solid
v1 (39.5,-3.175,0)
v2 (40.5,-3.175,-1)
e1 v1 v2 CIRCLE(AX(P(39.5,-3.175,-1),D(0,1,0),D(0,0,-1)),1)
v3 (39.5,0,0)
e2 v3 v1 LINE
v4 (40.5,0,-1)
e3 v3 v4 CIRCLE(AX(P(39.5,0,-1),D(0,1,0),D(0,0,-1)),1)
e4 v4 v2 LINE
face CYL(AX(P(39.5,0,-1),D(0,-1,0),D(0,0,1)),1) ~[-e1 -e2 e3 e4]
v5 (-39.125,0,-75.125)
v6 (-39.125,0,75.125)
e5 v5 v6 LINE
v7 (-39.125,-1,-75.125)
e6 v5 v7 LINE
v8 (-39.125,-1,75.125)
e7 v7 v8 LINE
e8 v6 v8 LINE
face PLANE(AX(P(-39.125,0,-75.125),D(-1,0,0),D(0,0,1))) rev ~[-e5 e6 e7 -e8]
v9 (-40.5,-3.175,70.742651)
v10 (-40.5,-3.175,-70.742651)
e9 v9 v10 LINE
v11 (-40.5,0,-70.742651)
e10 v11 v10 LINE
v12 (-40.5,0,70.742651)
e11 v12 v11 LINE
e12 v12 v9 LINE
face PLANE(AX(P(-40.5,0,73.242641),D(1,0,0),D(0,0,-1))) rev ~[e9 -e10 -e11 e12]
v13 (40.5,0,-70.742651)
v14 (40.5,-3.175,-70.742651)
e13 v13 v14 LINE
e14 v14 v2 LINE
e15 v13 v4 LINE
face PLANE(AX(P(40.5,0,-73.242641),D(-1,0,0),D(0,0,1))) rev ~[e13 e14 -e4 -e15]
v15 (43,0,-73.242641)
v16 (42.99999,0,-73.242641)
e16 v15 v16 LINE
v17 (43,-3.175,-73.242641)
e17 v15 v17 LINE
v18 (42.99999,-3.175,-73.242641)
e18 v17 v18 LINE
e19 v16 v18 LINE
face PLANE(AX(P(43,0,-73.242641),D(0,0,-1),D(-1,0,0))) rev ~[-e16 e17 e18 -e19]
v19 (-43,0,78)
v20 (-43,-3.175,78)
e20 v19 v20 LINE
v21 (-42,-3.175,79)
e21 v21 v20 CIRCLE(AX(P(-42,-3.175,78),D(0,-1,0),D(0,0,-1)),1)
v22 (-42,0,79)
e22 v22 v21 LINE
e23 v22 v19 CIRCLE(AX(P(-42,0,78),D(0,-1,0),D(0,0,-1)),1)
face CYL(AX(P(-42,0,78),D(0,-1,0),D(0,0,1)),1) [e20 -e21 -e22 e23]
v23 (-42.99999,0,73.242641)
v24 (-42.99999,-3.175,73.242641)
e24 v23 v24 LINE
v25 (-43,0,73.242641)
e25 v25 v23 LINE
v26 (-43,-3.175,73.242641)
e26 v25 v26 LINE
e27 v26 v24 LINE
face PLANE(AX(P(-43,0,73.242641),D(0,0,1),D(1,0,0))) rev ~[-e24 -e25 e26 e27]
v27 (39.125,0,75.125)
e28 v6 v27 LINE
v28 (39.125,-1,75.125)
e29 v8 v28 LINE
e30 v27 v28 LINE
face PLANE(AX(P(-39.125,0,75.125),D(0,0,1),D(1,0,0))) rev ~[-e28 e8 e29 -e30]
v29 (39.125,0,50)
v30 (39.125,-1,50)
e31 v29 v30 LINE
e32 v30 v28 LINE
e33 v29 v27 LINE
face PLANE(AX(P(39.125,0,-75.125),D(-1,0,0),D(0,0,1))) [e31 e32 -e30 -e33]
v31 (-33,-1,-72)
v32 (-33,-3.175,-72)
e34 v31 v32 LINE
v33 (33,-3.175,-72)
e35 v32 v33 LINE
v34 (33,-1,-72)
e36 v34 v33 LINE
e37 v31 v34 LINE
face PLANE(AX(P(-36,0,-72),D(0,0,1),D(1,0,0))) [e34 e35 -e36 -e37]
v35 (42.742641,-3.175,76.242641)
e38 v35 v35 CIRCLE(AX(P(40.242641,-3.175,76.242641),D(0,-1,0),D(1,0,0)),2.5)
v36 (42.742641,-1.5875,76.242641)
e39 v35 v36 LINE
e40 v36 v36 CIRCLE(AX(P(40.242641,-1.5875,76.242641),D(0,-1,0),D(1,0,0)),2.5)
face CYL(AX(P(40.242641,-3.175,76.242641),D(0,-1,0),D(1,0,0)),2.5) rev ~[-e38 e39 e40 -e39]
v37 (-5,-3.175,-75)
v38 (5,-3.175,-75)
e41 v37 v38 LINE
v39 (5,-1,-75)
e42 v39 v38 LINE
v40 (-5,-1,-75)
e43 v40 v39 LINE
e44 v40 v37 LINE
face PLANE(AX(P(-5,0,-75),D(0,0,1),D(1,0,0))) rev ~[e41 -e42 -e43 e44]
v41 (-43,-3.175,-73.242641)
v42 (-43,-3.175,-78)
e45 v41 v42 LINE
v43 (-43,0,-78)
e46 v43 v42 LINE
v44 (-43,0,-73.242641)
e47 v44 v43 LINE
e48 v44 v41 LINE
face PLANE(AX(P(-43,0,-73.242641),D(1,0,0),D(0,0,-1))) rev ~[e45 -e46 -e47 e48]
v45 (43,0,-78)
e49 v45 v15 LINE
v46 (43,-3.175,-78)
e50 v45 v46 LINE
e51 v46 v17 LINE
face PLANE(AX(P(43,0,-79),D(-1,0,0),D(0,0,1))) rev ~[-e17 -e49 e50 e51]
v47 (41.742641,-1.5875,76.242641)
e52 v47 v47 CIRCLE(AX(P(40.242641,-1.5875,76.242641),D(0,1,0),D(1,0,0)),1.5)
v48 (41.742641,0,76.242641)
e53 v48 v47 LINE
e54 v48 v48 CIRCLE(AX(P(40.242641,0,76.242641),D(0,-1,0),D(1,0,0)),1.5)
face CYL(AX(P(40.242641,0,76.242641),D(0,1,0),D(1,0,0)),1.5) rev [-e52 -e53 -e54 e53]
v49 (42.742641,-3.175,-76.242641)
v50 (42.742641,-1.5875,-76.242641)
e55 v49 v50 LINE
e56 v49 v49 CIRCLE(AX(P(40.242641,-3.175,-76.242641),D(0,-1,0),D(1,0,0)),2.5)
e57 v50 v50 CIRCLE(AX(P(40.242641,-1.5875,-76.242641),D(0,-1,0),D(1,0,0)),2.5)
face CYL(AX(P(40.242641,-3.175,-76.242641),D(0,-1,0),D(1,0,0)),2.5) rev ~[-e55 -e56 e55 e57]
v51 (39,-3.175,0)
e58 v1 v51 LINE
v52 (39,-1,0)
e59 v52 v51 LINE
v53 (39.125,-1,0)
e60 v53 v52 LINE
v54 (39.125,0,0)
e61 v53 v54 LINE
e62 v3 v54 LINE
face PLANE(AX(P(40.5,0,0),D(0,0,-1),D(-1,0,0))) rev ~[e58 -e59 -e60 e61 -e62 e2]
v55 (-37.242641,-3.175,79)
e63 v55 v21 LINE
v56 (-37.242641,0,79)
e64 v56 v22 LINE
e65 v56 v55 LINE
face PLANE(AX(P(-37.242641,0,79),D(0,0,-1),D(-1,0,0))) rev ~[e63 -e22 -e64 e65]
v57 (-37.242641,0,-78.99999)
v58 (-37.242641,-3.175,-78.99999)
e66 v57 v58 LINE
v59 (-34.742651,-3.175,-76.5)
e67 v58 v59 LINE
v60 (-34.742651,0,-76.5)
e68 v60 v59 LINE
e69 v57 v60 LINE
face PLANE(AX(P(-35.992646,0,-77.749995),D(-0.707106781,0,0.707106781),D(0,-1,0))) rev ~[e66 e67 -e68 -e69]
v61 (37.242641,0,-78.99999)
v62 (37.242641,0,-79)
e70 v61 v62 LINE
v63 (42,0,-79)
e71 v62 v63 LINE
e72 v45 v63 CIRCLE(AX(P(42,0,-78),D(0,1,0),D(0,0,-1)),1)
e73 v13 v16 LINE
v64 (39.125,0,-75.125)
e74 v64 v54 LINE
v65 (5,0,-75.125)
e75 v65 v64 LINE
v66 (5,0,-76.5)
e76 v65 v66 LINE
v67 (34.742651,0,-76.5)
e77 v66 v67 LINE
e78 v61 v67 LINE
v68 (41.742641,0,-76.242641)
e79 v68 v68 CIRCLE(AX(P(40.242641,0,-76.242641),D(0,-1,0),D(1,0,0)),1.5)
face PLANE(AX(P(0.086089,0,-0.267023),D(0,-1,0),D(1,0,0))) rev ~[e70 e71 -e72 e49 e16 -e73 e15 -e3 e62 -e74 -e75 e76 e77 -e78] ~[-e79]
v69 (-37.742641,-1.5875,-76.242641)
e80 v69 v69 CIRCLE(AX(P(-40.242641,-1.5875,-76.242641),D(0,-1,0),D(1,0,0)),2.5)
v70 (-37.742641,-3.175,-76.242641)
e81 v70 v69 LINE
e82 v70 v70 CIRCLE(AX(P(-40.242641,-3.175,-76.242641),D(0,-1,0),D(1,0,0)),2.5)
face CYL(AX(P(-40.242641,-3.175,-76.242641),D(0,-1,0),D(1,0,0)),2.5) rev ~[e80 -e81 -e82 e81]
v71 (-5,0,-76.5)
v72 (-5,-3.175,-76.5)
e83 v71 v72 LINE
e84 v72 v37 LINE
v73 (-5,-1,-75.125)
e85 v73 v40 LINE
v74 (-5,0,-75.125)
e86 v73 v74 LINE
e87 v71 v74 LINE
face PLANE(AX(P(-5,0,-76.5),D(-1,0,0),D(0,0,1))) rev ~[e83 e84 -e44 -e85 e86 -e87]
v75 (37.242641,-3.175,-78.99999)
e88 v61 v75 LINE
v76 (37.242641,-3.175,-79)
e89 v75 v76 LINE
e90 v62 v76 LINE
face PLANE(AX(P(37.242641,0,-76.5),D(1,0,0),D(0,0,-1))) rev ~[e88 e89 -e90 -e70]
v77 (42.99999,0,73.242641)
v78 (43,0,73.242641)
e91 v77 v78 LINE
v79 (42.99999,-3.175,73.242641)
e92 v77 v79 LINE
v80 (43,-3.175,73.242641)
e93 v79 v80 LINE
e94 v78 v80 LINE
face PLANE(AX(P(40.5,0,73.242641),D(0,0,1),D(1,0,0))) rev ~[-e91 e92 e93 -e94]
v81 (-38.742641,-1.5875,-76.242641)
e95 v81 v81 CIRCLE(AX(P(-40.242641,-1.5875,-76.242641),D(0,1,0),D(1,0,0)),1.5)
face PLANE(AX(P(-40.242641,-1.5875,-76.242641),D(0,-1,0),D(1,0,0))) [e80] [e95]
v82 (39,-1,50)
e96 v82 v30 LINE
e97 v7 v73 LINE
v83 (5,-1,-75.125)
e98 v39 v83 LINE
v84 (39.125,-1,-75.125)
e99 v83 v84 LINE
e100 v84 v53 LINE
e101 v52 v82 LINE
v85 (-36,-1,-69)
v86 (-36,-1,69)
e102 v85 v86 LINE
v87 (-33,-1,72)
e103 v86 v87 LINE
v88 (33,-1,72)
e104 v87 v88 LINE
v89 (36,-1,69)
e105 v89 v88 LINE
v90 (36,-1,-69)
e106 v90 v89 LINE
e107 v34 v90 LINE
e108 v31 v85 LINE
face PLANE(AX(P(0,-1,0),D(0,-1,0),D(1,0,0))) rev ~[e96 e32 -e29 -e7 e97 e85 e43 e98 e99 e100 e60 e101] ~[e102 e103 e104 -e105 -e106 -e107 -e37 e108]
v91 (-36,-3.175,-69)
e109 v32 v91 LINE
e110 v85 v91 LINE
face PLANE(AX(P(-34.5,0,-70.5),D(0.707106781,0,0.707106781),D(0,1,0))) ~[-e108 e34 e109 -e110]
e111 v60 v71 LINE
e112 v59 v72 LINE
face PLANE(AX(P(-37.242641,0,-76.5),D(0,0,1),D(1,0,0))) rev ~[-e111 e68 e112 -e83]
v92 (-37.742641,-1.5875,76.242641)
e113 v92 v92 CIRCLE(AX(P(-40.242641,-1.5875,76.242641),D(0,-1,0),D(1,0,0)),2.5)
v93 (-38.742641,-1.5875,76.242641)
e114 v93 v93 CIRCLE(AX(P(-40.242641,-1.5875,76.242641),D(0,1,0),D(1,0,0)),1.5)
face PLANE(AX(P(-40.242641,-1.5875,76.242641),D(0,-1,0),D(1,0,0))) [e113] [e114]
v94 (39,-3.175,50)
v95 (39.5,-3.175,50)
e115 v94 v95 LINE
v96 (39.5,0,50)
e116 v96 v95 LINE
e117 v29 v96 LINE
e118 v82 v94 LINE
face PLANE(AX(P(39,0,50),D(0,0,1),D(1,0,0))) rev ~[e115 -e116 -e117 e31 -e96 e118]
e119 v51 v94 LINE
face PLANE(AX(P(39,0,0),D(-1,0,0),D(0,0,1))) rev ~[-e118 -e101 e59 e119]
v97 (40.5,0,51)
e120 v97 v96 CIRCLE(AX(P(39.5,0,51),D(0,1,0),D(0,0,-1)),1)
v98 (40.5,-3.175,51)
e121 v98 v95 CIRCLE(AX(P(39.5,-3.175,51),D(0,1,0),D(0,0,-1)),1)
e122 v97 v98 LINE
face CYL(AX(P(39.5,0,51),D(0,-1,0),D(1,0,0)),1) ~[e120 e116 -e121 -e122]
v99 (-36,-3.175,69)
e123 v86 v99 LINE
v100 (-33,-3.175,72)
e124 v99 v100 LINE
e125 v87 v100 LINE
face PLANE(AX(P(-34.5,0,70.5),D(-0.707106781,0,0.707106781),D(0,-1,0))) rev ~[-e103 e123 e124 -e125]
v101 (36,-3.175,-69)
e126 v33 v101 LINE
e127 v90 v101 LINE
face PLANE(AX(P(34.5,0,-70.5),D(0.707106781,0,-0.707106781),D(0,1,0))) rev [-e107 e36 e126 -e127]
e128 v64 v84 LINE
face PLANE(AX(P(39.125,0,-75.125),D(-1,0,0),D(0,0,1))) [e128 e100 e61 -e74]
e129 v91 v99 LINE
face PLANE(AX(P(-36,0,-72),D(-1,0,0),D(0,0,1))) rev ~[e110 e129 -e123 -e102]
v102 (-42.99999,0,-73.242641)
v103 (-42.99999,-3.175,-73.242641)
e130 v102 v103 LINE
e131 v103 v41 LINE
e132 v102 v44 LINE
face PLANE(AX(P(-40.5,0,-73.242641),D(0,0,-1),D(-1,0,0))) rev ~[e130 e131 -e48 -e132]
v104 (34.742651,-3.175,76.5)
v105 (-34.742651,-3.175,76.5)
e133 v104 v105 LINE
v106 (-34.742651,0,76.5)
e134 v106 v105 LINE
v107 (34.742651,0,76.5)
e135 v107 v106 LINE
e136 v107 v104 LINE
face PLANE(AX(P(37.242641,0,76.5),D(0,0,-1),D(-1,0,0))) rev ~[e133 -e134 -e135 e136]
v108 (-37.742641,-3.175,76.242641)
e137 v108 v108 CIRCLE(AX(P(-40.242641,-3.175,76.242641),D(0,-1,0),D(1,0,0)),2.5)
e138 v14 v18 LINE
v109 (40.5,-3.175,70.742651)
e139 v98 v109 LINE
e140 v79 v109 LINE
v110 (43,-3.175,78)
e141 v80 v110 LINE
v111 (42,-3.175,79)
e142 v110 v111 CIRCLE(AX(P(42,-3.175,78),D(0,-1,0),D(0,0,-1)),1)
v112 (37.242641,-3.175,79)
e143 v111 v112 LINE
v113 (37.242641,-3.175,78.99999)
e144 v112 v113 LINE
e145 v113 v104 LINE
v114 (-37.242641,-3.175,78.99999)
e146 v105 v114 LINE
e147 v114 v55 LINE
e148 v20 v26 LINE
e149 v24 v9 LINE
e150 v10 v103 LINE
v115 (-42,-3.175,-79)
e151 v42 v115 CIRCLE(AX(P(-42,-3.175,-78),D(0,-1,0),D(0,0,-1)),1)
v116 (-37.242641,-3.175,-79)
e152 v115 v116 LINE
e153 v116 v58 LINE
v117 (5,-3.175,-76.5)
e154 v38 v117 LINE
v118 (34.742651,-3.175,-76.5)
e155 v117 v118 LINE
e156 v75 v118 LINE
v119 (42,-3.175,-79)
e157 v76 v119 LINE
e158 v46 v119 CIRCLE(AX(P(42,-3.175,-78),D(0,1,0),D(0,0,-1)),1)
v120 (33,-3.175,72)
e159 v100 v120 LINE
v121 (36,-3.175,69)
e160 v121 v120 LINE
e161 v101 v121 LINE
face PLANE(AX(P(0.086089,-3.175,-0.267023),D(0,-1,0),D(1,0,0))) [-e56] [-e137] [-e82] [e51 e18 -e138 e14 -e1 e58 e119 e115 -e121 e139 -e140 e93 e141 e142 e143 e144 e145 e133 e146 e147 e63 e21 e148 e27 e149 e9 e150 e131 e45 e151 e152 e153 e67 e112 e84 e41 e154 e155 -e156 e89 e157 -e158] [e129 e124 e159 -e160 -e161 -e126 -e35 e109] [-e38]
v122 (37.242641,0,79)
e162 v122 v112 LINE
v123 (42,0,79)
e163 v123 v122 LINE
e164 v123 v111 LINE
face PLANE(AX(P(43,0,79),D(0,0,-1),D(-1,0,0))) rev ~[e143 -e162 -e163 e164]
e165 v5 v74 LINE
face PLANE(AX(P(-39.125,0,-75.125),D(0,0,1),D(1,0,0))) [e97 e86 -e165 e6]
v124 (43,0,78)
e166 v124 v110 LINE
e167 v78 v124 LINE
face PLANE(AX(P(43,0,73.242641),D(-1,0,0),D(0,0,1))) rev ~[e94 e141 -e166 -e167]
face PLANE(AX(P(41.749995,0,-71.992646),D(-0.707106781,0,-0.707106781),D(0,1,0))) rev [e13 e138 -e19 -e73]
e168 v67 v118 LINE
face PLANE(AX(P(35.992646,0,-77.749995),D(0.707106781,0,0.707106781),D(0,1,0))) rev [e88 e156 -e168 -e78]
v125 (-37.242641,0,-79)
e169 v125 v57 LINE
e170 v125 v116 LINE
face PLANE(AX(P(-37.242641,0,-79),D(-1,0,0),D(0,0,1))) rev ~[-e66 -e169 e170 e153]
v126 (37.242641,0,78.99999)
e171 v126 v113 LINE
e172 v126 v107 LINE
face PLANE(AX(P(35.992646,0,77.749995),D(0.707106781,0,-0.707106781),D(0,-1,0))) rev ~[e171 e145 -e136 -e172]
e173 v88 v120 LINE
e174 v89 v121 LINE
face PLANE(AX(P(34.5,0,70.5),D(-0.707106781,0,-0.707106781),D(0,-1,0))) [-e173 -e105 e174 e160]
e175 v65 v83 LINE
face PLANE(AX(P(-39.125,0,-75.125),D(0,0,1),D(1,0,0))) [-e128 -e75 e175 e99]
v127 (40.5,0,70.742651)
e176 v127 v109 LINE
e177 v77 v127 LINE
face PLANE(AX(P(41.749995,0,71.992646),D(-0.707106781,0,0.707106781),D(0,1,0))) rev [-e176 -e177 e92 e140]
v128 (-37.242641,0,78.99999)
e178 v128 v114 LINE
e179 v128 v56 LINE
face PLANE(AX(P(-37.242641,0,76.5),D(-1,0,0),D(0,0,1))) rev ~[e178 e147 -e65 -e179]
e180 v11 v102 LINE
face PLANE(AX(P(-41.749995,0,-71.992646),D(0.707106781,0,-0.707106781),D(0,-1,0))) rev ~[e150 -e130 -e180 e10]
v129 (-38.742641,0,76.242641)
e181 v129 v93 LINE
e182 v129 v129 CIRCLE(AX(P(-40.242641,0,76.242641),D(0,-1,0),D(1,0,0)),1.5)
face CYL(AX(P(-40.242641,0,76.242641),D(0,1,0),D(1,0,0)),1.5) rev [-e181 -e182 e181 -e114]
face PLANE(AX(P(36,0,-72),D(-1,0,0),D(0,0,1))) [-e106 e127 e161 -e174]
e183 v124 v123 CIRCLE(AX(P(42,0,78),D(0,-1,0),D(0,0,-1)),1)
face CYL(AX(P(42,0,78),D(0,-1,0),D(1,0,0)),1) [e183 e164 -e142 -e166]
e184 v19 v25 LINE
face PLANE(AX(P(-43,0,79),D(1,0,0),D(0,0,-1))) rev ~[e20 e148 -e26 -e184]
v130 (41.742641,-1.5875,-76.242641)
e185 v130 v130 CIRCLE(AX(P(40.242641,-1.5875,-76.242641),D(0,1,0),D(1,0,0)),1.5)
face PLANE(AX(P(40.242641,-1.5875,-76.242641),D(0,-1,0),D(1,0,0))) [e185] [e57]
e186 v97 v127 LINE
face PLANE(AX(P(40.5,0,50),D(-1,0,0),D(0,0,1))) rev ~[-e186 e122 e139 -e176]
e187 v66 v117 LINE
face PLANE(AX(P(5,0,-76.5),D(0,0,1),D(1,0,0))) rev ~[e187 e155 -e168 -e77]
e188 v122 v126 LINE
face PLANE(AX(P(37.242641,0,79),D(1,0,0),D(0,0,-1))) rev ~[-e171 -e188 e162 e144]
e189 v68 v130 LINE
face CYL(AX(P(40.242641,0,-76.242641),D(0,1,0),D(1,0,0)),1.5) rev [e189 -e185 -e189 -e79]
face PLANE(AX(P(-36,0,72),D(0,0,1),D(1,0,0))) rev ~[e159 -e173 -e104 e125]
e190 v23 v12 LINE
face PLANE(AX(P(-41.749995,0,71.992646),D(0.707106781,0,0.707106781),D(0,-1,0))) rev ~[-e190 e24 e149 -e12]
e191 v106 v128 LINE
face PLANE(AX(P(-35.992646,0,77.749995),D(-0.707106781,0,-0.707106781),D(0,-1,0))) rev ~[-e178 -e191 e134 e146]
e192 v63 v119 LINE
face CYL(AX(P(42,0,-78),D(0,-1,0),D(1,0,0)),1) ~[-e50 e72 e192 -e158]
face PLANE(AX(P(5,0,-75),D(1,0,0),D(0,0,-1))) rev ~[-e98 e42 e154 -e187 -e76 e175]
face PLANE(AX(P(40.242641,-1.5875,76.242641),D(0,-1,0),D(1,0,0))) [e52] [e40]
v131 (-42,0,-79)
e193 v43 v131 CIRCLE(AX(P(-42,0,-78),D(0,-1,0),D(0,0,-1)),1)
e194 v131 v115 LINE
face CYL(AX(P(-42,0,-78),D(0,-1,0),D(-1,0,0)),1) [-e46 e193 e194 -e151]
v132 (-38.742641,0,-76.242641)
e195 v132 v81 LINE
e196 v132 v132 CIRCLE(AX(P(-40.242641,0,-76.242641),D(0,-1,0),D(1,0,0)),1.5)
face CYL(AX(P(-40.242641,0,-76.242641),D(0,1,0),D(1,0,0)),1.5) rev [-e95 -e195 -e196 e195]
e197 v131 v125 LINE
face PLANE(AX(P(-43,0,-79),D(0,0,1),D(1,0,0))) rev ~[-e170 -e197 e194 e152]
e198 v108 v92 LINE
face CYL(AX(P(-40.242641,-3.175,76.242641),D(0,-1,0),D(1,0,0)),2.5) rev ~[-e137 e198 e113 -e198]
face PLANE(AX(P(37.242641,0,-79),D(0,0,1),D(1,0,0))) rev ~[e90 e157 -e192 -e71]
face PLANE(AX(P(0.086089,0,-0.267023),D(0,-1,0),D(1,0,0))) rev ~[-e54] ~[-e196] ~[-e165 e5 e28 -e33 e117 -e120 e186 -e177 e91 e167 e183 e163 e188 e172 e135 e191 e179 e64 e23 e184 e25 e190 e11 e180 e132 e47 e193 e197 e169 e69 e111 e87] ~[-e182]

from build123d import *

# Parameters (mm, degrees)
F1_R     = 1.5
F1_W     = 72
F1_H     = 144
F2_DEPTH = 3.175
F3_SIZE  = 3
F4_SIZE  = 2.49999
F5_R     = 1
F6_R     = 2.5
F7_DEPTH = 1.5875
F8_W     = 78.25
F8_H     = 150.25
F9_DEPTH = 1


# Not quite as in the source:
# - a fillet or chamfer is up to 0.001 mm smaller than in the source, because OpenCascade refuses the exact size


with BuildPart() as f2:
    # F1 (on Front) → F2 (new body)
    with BuildSketch(Plane.XZ):
        Polygon((43, 73.2426406871), (43, 79), (37.2426406871, 79), (37.2426406871, 76.5), (-37.2426406871, 76.5), (-37.2426406871, 79), (-43, 79), (-43, 73.2426406871), (-40.5, 73.2426406871), (-40.5, -73.2426406871), (-43, -73.2426406871), (-43, -79), (-37.2426406871, -79), (-37.2426406871, -76.5), (-5, -76.5), (-5, -75), (5, -75), (5, -76.5), (37.2426406871, -76.5), (37.2426406871, -79), (43, -79), (43, -73.2426406871), (40.5, -73.2426406871), (40.5, 0), (39, 0), (39, 50), (40.5, 50), (40.5, 73.2426406871), align=None)
        with Locations((-40.2426406871, -76.2426406871)):
            Circle(F1_R, mode=Mode.SUBTRACT)
        with Locations((40.2426406871, -76.2426406871)):
            Circle(F1_R, mode=Mode.SUBTRACT)
        with Locations((-40.2426406871, 76.2426406871)):
            Circle(F1_R, mode=Mode.SUBTRACT)
        Rectangle(F1_W, F1_H, mode=Mode.SUBTRACT)
        with Locations((40.2426406871, 76.2426406871)):
            Circle(F1_R, mode=Mode.SUBTRACT)
    extrude(amount=F2_DEPTH)

    # F3
    f3_edges = [f2.edges().sort_by_distance(p)[0] for p in [
        (-36, -1.5875, 72),
        (36, -1.5875, 72),
        (36, -1.5875, -72),
        (-36, -1.5875, -72),
    ]]
    chamfer(f3_edges, length=F3_SIZE)

    # F4 (size 2.5 in the source; OpenCascade refuses exactly that, so slightly less here)
    f4_edges = [f2.edges().sort_by_distance(p)[0] for p in [
        (-37.242641, -1.5875, 76.5),
        (-40.5, -1.5875, 73.242641),
        (40.5, -1.5875, 73.242641),
        (37.242641, -1.5875, 76.5),
        (37.242641, -1.5875, -76.5),
        (40.5, -1.5875, -73.242641),
        (-40.5, -1.5875, -73.242641),
        (-37.242641, -1.5875, -76.5),
    ]]
    chamfer(f4_edges, length=F4_SIZE)

    # F5
    f5_edges = [f2.edges().sort_by_distance(p)[0] for p in [
        (-43, -1.5875, 79),
        (43, -1.5875, 79),
        (43, -1.5875, -79),
        (-43, -1.5875, -79),
        (40.5, -1.5875, 0),
        (40.5, -1.5875, 50),
    ]]
    fillet(f5_edges, radius=F5_R)

    # F6 (on face) → F7 (cut)
    with BuildSketch(Plane.XZ.offset(3.175)):
        with Locations((-40.2426406871, 76.2426406871)):
            Circle(F6_R)
        with Locations((40.2426406871, 76.2426406871)):
            Circle(F6_R)
        with Locations((40.2426406871, -76.2426406871)):
            Circle(F6_R)
        with Locations((-40.2426406871, -76.2426406871)):
            Circle(F6_R)
    extrude(amount=-F7_DEPTH, mode=Mode.SUBTRACT)

    # F8 (on face) → F9 (cut)
    with BuildSketch(Plane.XZ):
        Rectangle(F8_W, F8_H)
    extrude(amount=F9_DEPTH, mode=Mode.SUBTRACT)


solid = f2.part
